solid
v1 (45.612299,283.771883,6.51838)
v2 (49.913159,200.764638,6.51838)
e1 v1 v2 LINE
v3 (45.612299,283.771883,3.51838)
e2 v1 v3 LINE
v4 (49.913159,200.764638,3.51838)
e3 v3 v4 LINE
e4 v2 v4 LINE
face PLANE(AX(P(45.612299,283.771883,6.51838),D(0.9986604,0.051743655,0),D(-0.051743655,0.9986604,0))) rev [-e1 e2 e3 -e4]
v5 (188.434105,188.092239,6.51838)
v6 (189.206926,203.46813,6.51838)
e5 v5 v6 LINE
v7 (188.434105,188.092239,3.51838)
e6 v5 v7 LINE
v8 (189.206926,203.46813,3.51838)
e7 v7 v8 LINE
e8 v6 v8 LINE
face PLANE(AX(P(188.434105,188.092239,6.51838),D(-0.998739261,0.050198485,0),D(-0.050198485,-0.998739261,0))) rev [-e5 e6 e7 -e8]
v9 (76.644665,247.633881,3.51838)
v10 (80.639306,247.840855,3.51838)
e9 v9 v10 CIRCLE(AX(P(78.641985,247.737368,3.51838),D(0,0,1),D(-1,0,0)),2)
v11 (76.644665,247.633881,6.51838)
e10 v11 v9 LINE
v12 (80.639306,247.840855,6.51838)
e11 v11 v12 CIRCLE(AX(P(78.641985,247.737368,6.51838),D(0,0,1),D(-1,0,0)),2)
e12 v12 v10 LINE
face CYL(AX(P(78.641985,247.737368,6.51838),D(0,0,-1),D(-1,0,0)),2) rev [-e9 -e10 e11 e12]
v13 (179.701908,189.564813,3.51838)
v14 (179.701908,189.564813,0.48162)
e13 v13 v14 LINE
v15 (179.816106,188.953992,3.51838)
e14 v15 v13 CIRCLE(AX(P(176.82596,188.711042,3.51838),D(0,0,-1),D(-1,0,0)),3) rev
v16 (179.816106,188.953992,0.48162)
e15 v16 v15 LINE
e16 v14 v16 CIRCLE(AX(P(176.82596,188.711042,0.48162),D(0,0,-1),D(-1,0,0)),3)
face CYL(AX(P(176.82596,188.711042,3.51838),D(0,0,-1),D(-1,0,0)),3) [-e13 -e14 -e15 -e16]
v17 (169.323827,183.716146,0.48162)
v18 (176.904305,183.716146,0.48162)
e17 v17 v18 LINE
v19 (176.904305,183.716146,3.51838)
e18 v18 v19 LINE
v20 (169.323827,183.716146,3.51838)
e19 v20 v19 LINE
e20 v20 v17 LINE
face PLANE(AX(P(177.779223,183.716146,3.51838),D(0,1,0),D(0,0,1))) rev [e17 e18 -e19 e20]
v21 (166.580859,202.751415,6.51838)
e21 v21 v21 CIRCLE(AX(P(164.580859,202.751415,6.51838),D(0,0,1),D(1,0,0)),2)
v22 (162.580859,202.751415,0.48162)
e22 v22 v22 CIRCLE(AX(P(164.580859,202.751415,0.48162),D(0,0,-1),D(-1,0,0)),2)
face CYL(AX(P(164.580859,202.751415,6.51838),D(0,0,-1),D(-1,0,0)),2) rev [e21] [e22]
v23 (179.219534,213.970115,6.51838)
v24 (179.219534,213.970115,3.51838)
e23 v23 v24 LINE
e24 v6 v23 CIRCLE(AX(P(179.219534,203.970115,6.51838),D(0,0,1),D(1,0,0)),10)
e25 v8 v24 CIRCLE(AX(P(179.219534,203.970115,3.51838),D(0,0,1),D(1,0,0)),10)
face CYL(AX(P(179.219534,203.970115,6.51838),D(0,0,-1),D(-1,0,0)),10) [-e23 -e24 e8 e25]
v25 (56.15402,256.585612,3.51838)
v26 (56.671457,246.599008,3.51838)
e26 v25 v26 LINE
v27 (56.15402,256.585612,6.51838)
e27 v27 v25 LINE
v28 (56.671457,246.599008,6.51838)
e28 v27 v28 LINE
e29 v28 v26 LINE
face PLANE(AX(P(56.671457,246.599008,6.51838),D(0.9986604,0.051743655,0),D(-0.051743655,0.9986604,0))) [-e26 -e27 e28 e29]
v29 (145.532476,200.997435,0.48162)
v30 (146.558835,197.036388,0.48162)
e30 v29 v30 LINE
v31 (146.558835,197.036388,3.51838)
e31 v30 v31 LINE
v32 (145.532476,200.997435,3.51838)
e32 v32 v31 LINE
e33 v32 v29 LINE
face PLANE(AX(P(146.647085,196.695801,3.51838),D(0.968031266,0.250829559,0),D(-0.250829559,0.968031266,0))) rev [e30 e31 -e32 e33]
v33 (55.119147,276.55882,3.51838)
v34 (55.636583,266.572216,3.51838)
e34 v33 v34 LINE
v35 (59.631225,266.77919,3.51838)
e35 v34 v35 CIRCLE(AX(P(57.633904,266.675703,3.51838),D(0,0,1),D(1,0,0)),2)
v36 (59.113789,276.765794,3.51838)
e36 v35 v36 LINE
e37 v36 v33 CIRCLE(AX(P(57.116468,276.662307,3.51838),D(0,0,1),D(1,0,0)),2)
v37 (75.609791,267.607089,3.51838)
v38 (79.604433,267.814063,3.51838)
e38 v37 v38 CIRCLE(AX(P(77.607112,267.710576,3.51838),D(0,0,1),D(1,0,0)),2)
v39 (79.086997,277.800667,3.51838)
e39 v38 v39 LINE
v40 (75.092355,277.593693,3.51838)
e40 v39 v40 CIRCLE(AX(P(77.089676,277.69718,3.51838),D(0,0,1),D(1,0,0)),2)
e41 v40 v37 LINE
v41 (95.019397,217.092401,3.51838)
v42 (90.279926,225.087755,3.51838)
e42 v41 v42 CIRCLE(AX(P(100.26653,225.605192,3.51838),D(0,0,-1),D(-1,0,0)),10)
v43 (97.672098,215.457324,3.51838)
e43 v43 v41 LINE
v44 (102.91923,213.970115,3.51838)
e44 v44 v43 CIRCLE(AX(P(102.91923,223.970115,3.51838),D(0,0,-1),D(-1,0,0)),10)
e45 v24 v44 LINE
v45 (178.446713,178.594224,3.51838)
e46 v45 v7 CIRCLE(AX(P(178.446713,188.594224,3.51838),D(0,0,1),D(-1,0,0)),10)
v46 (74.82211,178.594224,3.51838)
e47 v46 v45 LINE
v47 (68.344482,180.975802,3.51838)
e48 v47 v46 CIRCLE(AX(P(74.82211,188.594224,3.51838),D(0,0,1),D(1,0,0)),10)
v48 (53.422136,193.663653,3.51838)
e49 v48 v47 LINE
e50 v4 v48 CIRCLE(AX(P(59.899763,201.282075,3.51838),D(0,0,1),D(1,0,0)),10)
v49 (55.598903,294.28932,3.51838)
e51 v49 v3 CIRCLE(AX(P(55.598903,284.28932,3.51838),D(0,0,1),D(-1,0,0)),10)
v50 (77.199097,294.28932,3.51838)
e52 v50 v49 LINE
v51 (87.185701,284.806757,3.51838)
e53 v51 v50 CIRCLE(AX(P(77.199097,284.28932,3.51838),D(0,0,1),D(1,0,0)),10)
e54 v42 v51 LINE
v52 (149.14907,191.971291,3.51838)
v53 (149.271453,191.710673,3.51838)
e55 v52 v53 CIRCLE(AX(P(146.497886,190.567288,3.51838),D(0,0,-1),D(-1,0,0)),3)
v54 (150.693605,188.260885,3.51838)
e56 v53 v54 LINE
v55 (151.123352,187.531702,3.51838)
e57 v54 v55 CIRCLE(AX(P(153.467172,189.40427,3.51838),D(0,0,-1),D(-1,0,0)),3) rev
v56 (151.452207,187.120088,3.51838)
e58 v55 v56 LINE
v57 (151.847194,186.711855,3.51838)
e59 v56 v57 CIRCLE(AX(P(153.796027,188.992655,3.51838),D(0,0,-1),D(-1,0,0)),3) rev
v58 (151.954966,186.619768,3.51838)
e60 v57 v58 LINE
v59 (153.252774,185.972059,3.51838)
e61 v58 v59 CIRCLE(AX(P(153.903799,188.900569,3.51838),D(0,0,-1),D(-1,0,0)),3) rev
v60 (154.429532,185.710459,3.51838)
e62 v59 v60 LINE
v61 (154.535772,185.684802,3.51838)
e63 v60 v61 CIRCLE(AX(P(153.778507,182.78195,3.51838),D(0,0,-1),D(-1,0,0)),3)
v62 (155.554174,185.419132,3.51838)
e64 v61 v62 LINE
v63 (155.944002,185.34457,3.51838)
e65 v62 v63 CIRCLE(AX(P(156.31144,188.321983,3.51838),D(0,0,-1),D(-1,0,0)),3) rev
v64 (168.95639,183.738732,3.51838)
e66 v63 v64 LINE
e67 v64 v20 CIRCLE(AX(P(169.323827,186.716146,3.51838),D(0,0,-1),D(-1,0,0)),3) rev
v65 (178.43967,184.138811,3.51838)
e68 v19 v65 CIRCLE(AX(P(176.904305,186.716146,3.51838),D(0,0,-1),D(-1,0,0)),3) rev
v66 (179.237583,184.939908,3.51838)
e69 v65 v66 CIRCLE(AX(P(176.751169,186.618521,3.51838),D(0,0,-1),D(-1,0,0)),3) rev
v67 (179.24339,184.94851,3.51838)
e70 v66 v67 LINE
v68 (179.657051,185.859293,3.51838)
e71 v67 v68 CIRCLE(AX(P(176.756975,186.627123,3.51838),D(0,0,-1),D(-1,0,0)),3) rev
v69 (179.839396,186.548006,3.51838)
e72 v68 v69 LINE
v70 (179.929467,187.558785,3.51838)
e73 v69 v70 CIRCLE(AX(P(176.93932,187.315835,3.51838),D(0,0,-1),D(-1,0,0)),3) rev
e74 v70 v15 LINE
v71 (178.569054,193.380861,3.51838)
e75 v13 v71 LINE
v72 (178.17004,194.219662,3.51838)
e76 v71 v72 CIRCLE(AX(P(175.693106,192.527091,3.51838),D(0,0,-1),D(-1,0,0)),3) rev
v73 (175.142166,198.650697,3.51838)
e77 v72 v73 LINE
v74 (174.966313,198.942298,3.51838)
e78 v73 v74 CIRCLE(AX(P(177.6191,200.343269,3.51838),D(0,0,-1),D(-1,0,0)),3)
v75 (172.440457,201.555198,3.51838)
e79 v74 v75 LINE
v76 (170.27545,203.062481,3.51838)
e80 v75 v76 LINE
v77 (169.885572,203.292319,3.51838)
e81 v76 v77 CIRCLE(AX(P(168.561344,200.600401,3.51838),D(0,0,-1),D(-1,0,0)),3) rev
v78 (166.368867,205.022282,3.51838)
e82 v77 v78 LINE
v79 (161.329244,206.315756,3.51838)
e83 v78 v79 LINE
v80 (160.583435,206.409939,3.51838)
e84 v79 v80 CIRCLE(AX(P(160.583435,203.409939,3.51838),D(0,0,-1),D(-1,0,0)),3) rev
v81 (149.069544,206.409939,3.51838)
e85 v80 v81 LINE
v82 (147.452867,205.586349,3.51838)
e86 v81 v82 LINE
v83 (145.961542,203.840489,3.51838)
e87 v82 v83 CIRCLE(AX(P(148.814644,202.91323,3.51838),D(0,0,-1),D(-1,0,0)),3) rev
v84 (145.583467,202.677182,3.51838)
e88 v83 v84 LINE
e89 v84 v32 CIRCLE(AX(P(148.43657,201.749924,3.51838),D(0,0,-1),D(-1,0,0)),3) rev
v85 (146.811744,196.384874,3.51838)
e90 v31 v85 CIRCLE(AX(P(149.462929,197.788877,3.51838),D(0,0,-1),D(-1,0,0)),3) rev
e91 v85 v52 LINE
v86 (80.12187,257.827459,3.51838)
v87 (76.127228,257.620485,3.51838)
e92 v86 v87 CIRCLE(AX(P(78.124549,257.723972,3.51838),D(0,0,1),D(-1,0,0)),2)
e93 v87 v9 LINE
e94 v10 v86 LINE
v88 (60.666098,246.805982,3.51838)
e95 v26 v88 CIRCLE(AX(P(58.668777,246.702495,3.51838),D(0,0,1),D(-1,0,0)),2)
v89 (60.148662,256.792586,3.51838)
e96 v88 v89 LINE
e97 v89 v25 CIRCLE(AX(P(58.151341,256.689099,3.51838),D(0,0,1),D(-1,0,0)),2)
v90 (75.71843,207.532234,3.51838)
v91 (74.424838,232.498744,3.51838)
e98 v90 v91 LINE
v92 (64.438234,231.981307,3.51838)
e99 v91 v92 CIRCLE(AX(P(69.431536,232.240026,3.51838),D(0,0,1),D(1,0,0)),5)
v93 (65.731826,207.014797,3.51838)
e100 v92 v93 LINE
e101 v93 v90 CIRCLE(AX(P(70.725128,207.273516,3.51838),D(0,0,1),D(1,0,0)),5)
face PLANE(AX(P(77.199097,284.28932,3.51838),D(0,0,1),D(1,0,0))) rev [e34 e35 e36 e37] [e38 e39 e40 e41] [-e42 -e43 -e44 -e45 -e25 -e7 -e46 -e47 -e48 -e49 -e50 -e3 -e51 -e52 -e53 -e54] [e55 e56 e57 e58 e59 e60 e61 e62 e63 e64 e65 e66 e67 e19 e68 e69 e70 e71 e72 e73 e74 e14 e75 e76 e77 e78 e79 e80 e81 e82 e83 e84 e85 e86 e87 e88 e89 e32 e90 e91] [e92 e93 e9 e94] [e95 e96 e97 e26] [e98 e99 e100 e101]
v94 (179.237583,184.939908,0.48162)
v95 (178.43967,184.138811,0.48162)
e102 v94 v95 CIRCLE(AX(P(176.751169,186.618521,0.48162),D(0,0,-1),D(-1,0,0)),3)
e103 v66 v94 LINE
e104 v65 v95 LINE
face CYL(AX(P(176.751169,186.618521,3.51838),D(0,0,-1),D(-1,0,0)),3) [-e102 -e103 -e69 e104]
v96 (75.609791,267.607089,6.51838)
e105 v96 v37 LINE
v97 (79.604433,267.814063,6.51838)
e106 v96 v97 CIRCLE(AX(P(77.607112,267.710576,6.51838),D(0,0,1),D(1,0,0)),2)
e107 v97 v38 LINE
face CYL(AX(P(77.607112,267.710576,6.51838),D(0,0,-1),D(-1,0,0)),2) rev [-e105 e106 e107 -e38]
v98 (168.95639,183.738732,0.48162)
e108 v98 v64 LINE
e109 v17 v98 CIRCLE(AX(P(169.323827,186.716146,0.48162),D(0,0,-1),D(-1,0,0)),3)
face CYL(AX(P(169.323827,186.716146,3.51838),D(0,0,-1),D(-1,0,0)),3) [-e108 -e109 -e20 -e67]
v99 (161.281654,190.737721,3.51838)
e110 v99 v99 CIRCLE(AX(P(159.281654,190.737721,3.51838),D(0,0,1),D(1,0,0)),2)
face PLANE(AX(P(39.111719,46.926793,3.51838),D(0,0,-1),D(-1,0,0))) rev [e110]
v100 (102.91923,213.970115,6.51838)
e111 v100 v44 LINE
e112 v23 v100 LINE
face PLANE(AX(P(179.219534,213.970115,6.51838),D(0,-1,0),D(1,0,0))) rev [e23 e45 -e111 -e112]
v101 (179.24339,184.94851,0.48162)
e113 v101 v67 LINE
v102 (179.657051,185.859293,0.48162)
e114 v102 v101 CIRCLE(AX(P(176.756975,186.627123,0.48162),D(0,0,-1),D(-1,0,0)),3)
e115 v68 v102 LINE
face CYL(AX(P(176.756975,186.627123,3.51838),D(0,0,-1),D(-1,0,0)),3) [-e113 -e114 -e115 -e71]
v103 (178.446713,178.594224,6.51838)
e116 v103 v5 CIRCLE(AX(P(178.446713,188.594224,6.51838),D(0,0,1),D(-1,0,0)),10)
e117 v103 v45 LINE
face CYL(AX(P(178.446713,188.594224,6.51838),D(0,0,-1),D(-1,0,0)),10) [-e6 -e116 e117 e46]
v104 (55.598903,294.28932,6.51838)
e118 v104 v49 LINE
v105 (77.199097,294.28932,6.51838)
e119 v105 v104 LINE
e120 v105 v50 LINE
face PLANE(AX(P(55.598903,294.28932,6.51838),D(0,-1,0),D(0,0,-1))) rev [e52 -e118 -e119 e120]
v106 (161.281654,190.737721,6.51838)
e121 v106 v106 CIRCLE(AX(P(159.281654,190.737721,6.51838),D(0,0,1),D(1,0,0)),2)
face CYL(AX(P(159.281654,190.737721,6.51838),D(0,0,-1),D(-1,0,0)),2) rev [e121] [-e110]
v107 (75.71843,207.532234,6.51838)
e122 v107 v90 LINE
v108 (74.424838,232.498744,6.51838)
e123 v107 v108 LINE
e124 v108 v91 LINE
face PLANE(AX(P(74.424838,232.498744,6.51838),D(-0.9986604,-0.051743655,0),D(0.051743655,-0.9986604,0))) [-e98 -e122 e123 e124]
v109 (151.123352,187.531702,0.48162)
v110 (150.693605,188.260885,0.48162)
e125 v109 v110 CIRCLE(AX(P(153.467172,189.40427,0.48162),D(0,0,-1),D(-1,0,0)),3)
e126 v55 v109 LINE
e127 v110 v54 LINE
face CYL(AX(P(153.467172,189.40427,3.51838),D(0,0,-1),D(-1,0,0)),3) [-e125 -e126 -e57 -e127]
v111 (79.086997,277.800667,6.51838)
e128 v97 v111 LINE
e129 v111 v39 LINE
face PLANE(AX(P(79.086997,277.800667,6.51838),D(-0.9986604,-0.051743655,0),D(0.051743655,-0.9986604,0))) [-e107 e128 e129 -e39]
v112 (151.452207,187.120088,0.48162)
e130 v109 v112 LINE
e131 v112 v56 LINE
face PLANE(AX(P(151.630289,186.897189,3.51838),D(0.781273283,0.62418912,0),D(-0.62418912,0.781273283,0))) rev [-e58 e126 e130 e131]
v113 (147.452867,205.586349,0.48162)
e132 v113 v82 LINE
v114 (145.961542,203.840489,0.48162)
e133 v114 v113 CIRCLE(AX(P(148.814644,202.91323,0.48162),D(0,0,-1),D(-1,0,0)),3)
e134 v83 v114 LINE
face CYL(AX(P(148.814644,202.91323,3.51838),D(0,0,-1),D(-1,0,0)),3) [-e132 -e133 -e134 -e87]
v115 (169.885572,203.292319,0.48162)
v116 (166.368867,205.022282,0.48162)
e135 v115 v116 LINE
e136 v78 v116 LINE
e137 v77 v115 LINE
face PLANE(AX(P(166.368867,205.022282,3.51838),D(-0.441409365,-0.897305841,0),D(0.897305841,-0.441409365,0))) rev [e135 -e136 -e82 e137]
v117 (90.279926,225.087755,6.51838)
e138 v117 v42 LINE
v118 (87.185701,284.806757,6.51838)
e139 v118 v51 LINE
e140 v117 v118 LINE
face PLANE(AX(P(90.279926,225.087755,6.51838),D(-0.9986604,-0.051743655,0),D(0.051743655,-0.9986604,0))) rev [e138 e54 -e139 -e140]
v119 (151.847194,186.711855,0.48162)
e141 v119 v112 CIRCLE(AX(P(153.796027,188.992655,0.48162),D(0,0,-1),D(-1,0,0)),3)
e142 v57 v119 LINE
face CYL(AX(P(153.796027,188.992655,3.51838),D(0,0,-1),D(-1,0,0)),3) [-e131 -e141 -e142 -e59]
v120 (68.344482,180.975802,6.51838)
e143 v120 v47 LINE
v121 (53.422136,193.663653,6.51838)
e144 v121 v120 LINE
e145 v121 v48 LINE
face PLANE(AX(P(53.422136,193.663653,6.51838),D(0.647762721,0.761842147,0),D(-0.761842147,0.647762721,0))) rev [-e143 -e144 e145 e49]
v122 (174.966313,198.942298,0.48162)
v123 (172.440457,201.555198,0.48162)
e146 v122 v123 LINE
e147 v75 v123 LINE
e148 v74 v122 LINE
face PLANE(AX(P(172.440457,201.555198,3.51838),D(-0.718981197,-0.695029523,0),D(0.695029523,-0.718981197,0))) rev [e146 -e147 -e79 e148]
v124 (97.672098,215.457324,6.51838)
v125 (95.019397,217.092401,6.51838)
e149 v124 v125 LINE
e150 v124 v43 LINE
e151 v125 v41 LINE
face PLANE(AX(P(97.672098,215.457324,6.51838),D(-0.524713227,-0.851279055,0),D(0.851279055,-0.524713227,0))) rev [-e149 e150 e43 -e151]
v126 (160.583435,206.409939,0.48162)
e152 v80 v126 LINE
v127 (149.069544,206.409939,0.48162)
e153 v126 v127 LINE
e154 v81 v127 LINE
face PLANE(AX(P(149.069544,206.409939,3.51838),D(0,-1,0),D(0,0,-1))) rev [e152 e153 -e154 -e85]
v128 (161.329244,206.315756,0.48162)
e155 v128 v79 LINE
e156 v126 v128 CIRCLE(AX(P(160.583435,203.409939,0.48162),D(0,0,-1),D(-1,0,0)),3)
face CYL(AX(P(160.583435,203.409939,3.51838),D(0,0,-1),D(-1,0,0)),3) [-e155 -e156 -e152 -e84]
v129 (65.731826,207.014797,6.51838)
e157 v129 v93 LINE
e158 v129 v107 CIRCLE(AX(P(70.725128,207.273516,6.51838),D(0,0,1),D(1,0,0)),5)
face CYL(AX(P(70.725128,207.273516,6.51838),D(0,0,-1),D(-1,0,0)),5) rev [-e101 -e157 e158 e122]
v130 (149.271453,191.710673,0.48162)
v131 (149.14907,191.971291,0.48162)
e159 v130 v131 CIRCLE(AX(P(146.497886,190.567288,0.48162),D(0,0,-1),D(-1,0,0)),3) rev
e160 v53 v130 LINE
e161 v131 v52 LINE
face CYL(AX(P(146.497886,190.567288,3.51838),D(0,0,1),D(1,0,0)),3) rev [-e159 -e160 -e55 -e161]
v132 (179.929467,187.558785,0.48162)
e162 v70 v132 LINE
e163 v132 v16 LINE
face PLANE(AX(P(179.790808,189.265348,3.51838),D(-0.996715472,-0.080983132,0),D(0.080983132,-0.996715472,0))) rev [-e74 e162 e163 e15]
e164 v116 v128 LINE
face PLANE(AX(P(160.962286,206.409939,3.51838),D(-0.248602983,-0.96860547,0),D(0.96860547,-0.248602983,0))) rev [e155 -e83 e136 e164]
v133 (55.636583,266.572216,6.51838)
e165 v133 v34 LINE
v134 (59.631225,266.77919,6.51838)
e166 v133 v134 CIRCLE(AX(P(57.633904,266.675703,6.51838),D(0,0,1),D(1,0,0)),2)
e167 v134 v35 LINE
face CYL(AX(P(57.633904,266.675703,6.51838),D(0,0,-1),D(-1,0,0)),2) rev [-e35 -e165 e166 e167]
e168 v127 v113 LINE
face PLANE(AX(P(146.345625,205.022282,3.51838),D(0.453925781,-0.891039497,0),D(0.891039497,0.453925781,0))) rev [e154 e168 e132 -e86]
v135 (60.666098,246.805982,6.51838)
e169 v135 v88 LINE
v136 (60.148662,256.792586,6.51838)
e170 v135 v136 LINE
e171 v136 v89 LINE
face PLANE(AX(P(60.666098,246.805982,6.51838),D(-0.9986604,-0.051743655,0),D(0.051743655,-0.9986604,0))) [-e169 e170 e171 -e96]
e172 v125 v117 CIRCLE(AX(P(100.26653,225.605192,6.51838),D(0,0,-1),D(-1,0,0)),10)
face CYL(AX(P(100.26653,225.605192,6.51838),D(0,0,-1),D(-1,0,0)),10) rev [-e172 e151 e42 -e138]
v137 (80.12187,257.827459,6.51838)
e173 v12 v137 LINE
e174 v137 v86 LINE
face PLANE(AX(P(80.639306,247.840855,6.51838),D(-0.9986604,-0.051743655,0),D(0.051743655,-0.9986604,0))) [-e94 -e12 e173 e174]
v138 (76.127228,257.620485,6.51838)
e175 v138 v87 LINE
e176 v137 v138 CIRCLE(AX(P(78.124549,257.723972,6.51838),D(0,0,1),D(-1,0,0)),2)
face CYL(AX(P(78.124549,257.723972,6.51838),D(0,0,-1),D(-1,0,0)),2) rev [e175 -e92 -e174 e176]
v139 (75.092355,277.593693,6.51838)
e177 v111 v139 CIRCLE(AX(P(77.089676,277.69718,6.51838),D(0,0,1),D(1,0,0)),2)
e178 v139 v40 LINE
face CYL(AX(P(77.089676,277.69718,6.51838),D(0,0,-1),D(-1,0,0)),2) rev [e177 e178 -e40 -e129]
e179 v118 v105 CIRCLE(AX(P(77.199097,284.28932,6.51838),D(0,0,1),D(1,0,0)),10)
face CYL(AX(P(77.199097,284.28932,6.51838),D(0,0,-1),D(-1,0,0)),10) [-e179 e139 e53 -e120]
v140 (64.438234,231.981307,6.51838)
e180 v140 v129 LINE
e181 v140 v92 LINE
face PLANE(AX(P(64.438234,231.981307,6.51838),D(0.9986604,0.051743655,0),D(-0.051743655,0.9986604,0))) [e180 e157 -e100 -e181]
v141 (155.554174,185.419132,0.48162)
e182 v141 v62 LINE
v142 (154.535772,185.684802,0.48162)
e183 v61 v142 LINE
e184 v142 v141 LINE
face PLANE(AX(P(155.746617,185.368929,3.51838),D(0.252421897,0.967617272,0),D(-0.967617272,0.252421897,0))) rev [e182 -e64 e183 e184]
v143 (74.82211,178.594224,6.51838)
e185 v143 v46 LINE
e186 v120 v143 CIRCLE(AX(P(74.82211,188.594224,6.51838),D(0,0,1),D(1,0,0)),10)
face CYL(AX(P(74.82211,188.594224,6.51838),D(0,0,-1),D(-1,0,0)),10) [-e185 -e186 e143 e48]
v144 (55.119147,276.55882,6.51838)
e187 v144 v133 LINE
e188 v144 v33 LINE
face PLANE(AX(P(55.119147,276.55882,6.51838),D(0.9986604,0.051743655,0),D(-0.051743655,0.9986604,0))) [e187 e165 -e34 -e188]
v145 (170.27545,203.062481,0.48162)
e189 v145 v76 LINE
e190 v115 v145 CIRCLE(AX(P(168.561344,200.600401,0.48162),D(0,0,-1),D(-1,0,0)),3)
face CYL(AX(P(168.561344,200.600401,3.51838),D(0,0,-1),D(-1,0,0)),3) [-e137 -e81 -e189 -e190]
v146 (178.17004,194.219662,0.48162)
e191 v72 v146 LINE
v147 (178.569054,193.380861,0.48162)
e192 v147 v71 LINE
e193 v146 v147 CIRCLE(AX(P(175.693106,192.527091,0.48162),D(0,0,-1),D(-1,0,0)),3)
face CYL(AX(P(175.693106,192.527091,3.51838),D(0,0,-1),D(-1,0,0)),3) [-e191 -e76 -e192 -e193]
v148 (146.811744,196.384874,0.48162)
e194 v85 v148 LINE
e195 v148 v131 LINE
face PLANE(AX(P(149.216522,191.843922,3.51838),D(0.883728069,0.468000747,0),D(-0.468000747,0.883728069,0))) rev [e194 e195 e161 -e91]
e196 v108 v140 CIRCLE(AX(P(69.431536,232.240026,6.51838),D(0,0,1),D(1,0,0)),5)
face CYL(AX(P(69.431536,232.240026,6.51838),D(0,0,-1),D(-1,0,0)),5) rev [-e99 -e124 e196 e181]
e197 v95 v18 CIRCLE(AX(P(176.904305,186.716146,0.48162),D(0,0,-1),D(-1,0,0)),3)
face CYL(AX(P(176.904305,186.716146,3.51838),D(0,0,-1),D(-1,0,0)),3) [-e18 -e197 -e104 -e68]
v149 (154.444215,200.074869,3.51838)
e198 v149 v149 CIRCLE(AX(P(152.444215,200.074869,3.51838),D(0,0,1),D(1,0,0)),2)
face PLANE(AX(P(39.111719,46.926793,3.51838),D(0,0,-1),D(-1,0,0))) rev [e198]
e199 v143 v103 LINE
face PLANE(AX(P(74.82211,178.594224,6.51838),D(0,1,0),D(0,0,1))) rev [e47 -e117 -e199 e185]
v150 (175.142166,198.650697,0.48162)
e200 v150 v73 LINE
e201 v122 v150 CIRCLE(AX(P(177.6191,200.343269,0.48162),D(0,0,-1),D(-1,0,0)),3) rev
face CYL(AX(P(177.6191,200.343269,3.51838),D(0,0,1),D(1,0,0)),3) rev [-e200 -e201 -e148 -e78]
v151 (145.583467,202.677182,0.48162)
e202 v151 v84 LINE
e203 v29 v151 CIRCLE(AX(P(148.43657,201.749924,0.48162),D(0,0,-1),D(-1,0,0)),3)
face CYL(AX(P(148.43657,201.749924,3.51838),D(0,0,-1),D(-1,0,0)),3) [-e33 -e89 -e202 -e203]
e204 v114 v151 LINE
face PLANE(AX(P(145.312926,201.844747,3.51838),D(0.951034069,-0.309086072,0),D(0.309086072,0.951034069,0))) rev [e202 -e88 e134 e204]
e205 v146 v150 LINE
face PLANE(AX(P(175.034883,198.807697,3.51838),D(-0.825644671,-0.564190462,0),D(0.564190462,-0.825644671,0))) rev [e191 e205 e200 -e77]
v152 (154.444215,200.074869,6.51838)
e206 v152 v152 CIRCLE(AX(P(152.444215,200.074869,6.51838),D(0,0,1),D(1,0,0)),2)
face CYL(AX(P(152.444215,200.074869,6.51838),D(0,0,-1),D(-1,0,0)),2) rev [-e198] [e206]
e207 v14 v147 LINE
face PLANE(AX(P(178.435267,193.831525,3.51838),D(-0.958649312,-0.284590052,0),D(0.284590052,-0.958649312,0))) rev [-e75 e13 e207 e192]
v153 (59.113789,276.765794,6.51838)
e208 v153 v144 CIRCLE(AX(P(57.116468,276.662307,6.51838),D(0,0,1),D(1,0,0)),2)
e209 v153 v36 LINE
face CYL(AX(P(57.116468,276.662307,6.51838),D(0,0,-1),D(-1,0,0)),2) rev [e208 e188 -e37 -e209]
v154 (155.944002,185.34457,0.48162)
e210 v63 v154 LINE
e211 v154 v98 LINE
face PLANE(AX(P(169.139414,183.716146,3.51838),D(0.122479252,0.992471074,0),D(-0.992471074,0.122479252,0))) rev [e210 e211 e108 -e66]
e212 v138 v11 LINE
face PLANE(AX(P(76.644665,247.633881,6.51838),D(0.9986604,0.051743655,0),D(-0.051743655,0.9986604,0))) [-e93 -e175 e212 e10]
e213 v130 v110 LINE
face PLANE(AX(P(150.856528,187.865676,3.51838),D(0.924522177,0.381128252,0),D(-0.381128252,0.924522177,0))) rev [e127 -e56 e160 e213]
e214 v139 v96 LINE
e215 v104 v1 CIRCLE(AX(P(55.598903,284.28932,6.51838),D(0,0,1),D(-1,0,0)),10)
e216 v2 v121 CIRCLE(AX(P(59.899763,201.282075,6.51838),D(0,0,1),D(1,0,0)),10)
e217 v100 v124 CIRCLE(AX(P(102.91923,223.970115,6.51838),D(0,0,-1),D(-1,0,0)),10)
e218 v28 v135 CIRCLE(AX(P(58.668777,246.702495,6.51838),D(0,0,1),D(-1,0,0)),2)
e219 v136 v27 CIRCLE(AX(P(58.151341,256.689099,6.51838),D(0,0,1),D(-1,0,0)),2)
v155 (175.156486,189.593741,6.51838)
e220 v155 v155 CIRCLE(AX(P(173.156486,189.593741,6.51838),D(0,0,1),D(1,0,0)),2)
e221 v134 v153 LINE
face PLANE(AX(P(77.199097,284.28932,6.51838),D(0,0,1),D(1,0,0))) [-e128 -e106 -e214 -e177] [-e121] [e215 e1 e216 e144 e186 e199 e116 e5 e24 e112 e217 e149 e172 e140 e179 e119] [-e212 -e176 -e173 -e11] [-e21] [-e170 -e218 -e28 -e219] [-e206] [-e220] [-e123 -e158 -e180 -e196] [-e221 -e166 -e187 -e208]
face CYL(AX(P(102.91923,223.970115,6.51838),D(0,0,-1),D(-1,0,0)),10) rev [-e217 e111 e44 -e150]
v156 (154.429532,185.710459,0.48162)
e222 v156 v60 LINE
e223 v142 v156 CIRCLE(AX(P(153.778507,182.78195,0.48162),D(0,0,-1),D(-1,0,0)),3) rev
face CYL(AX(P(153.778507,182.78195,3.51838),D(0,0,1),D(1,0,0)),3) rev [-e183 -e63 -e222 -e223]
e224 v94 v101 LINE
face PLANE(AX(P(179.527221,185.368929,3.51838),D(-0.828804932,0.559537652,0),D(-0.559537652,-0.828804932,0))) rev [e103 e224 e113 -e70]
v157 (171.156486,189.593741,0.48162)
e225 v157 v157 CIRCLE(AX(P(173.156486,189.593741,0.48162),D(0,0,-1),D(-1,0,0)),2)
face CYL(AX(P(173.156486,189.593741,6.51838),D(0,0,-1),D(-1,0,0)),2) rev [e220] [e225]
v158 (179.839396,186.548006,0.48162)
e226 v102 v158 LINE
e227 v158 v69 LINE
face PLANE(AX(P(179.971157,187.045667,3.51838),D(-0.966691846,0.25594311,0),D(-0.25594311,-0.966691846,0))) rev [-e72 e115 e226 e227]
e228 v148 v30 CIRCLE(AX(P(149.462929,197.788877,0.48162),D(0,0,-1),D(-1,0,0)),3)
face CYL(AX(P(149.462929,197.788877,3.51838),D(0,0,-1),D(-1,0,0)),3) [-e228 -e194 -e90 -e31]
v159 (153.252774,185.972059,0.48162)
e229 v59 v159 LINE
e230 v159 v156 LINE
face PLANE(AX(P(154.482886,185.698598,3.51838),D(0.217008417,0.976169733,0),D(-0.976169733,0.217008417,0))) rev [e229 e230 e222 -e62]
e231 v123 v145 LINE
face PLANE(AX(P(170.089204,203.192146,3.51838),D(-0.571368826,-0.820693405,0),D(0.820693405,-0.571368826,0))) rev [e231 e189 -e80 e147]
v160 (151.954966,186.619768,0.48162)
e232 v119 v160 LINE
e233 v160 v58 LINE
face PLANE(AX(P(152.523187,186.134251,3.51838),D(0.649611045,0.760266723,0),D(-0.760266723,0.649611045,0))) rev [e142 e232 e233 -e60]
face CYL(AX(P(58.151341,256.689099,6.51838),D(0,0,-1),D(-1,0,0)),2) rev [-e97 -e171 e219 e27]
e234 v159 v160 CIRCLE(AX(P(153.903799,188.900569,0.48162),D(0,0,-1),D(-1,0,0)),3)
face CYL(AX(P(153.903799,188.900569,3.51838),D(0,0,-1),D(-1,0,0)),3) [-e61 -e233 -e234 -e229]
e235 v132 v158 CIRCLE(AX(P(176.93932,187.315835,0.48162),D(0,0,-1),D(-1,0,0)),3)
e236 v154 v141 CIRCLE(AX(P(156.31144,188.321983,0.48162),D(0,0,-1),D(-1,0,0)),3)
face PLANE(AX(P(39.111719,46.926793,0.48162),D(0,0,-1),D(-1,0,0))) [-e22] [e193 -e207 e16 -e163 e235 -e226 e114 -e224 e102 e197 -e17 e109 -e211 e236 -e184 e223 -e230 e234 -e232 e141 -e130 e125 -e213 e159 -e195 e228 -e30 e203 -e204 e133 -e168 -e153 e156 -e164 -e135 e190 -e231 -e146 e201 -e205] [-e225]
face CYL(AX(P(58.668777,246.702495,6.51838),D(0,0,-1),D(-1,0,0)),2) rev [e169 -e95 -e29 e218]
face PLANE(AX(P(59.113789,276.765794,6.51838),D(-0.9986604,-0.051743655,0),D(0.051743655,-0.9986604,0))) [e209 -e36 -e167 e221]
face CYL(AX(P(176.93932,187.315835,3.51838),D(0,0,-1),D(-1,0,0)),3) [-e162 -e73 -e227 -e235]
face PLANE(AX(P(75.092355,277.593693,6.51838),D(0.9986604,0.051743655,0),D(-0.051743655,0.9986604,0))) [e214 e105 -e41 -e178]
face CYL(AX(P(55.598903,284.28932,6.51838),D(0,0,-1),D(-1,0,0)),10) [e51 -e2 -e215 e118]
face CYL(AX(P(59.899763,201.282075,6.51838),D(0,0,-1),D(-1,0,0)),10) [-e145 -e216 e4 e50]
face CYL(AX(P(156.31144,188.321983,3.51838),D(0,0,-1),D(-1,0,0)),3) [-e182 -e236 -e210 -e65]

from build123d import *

# Parameters (mm, degrees)
BOSS_EXTRUDE1_DEPTH = 4
SCALE4_SCALE        = 0.75919
FILLET6_R           = 3
FILLET7_R           = 3
SKETCH2_R           = 2
BOSS_EXTRUDE2_DEPTH = 3
CUT_EXTRUDE1_START  = -10
SKETCH3_R           = 2
CUT_EXTRUDE1_DEPTH  = 10


with BuildPart() as part:
    # Sketch1 → Boss-Extrude1 (new body)
    with BuildSketch(Plane.XY):
        Polygon((139.887521377, 204.056894723), (141.24778548, 208.242322731), (144.835713473, 210.070135105), (160.500754315, 210.070135105), (167.622266071, 208.242322731), (172.522669487, 205.831679823), (175.619724447, 203.675502319), (178.946764591, 200.233807794), (179.037084843, 200.056512483), (183.5160481, 193.501931379), (185.301557704, 187.487393826), (185.539112291, 184.563645059), (184.954362538, 182.355057305), (184.113784767, 181.109966828), (182.651910383, 180.178021908), (181.232301611, 180.178021908), (171.271612606, 180.178021908), (153.63070922, 182.355057305), (151.966131288, 182.789295026), (149.384829279, 183.363134026), (148.208709289, 184.36807152), (147.189516356, 185.643755739), (145.029311699, 190.88387399), (141.644867129, 197.274737006), align=None)
    extrude(amount=BOSS_EXTRUDE1_DEPTH)


with BuildPart() as part_1:
    # Scale4: scaled about (162.417336375, 194.870616826, 2)
    add(part.part.scale(SCALE4_SCALE).moved(Location((39.111718772, 46.926793238, 0.48162))))

    # Fillet6
    # the kernel refuses this fillet: 3 mm, written as the material it adds along each edge
    with BuildSketch(Plane(origin=(175.034883215, 198.80769695, 0.48162), x_dir=(0.5641904622979087, -0.8256446706980383, 0), z_dir=(0, 0, 1))) as fillet6_piece_1_section:
        with BuildLine():
            CenterArc((FILLET6_R * 0.0642311981219, FILLET6_R), FILLET6_R, 262.649743959, 7.350256041)
            Line((-FILLET6_R * 0.063703385216, FILLET6_R * 0.00821739156901), (0, 0))
            Line((0, 0), (FILLET6_R * 0.0642311981219, 0))
        make_face()
    fillet6_piece_1 = extrude(amount=3.03676, mode=Mode.PRIVATE)
    fillet6_piece_1 = split(fillet6_piece_1, bisect_by=Plane(origin=(175.064317261, 198.840916135, 2), z_dir=(-0.7189811970622167, -0.6950295233088893, 0)), keep=Keep.TOP, mode=Mode.PRIVATE)
    add(fillet6_piece_1)
    with BuildSketch(Plane(origin=(154.482885985, 185.698598128, 0.48162), x_dir=(-0.9761697325769959, 0.21700841734954968, 0), z_dir=(0, 0, 1))) as fillet6_piece_2:
        with BuildLine():
            CenterArc((FILLET6_R * 0.0182188067452, FILLET6_R), FILLET6_R, 267.912509474, 2.087490526)
            Line((-FILLET6_R * 0.0182067162065, FILLET6_R * 0.000663629563253), (0, 0))
            Line((0, 0), (FILLET6_R * 0.0182188067452, 0))
        make_face()
    extrude(amount=3.03676)
    with BuildSketch(Plane(origin=(149.216521921, 191.843921532, 0.48162), x_dir=(-0.4680007470830183, 0.8837280694476876, 0), z_dir=(0, 0, 1))) as fillet6_piece_3:
        with BuildLine():
            CenterArc((FILLET6_R * 0.0480422965927, FILLET6_R), FILLET6_R, 264.498987959, 5.501012041)
            Line((-FILLET6_R * 0.0478210380477, FILLET6_R * 0.00460549475516), (0, 0))
            Line((0, 0), (FILLET6_R * 0.0480422965927, 0))
        make_face()
    extrude(amount=3.03676)
    # the kernel refuses this fillet: 3 mm, written as the material it takes off along each edge
    with BuildSketch(Plane(origin=(170.089204221, 203.192146242, -0.085723646), x_dir=(0.8206934047378623, -0.5713688260832711, 0), z_dir=(0, 0, 1))) as fillet6_2_piece_1:
        with BuildLine():
            CenterArc((FILLET6_R * 0.0756458194575, -FILLET6_R), FILLET6_R, 90, 8.651894609)
            Line((-FILLET6_R * 0.0747850106227, -FILLET6_R * 0.0113794634131), (0, 0))
            Line((0, 0), (FILLET6_R * 0.0756458194575, 0))
        make_face()
    extrude(amount=4.171447292, mode=Mode.SUBTRACT)
    with BuildSketch(Plane(origin=(179.790808366, 189.265347757, -0.299334996), x_dir=(0.08098313210757263, -0.9967154720952452, 0), z_dir=(0, 0, 1))) as fillet6_2_piece_2:
        with BuildLine():
            CenterArc((FILLET6_R * 0.104127332747, -FILLET6_R), FILLET6_R, 90, 11.889267137)
            Line((-FILLET6_R * 0.101893551021, -FILLET6_R * 0.0214524051169), (0, 0))
            Line((0, 0), (FILLET6_R * 0.104127332747, 0))
        make_face()
    extrude(amount=4.598669991, mode=Mode.SUBTRACT)
    with BuildSketch(Plane(origin=(179.527221267, 185.368929193, -0.786529904), x_dir=(-0.5595376521790817, -0.8288049322934323, 0), z_dir=(0, 0, 1))) as fillet6_2_piece_3:
        with BuildLine():
            CenterArc((FILLET6_R * 0.169086653883, -FILLET6_R), FILLET6_R, 90, 19.194353316)
            Line((-FILLET6_R * 0.159686919919, -FILLET6_R * 0.0555912234793), (0, 0))
            Line((0, 0), (FILLET6_R * 0.169086653883, 0))
        make_face()
    extrude(amount=5.573059808, mode=Mode.SUBTRACT)
    with BuildSketch(Plane(origin=(178.435267329, 193.831524522, -0.693636489), x_dir=(0.2845900515763164, -0.9586493115544337, 0), z_dir=(0, 0, 1))) as fillet6_2_piece_4:
        with BuildLine():
            CenterArc((FILLET6_R * 0.156700865162, -FILLET6_R), FILLET6_R, 90, 17.811748872)
            Line((-FILLET6_R * 0.149189673688, -FILLET6_R * 0.0479333120825), (0, 0))
            Line((0, 0), (FILLET6_R * 0.156700865162, 0))
        make_face()
    extrude(amount=5.387272977, mode=Mode.SUBTRACT)
    with BuildSketch(Plane(origin=(178.88906303, 184.423668954, -1.075559702), x_dir=(-0.8432271980573246, -0.5375573387615439, 0), z_dir=(0, 0, 1))) as fillet6_2_piece_5:
        with BuildLine():
            CenterArc((FILLET6_R * 0.207623960269, -FILLET6_R), FILLET6_R, 90, 23.458660046)
            Line((-FILLET6_R * 0.190463329283, -FILLET6_R * 0.0826524595894), (0, 0))
            Line((0, 0), (FILLET6_R * 0.207623960269, 0))
        make_face()
    extrude(amount=6.151119404, mode=Mode.SUBTRACT)
    with BuildSketch(Plane(origin=(169.139414347, 183.71614569, 0.020587263), x_dir=(-0.9924710740045749, 0.12247925238261967, 0), z_dir=(0, 0, 1))) as fillet6_2_piece_6:
        with BuildLine():
            CenterArc((FILLET6_R * 0.0614710316153, -FILLET6_R), FILLET6_R, 90, 7.035208973)
            Line((-FILLET6_R * 0.0610082207674, -FILLET6_R * 0.00752892599542), (0, 0))
            Line((0, 0), (FILLET6_R * 0.0614710316153, 0))
        make_face()
    extrude(amount=3.958825474, mode=Mode.SUBTRACT)
    with BuildSketch(Plane(origin=(155.746616905, 185.368929193, -0.015587097), x_dir=(-0.9676172723968424, 0.2524218971470086, 0), z_dir=(0, 0, 1))) as fillet6_2_piece_7:
        with BuildLine():
            CenterArc((FILLET6_R * 0.0662942795425, -FILLET6_R), FILLET6_R, 90, 7.585665015)
            Line((-FILLET6_R * 0.0657141117056, -FILLET6_R * 0.00875140119136), (0, 0))
            Line((0, 0), (FILLET6_R * 0.0662942795425, 0))
        make_face()
    extrude(amount=4.031174193, mode=Mode.SUBTRACT)
    with BuildSketch(Plane(origin=(150.856527695, 187.865676157, -0.587064111), x_dir=(-0.3811282524443585, 0.9245221766884282, 0), z_dir=(0, 0, 1))) as fillet6_2_piece_8:
        with BuildLine():
            CenterArc((FILLET6_R * 0.14249121477, -FILLET6_R), FILLET6_R, 90, 16.21910898)
            Line((-FILLET6_R * 0.136820147731, -FILLET6_R * 0.0397994153417), (0, 0))
            Line((0, 0), (FILLET6_R * 0.14249121477, 0))
        make_face()
    extrude(amount=5.174128222, mode=Mode.SUBTRACT)
    with BuildSketch(Plane(origin=(151.630288778, 186.897189455, -0.231632642), x_dir=(-0.6241891196597051, 0.7812732831080572, 0), z_dir=(0, 0, 1))) as fillet6_2_piece_9:
        with BuildLine():
            CenterArc((FILLET6_R * 0.0951003522105, -FILLET6_R), FILLET6_R, 90, 10.865021551)
            Line((-FILLET6_R * 0.0933955804828, -FILLET6_R * 0.0179260295894), (0, 0))
            Line((0, 0), (FILLET6_R * 0.0951003522104, 0))
        make_face()
    extrude(amount=4.463265283, mode=Mode.SUBTRACT)
    with BuildSketch(Plane(origin=(152.523187313, 186.134250959, -1.386873198), x_dir=(-0.7602667232190712, 0.6496110448304708, 0), z_dir=(0, 0, 1))) as fillet6_2_piece_10:
        with BuildLine():
            CenterArc((FILLET6_R * 0.249132426376, -FILLET6_R), FILLET6_R, 90, 27.978899274)
            Line((-FILLET6_R * 0.220013935166, -FILLET6_R * 0.116879571377), (0, 0))
            Line((0, 0), (FILLET6_R * 0.249132426376, 0))
        make_face()
    extrude(amount=6.773746396, mode=Mode.SUBTRACT)
    with BuildSketch(Plane(origin=(177.779222616, 183.71614569, -1.705674136), x_dir=(-1, 0, 0), z_dir=(0, 0, 1))) as fillet6_2_piece_11:
        with BuildLine():
            CenterArc((FILLET6_R * 0.291639218067, -FILLET6_R), FILLET6_R, 90, 32.517510615)
            Line((-FILLET6_R * 0.245918120694, -FILLET6_R * 0.156772801943), (0, 0))
            Line((0, 0), (FILLET6_R * 0.291639218067, 0))
        make_face()
    extrude(amount=7.411348271, mode=Mode.SUBTRACT)
    with BuildSketch(Plane(origin=(146.647085448, 196.695800825, -0.397967253), x_dir=(0.4680007470830723, -0.8837280694476589, 0), z_dir=(0, 0, 1))) as fillet6_2_piece_12:
        with BuildLine():
            CenterArc((FILLET6_R * 0.117278300393, FILLET6_R), FILLET6_R, 256.622007888, 13.377992112)
            Line((-FILLET6_R * 0.114095932972, FILLET6_R * 0.027135176844), (0, 0))
            Line((0, 0), (FILLET6_R * 0.117278300394, 0))
        make_face()
    extrude(amount=4.795934506, mode=Mode.SUBTRACT)

    # Fillet7
    fillet7_edges = [part_1.edges().sort_by_distance(p)[0] for p in [
        (145.312926127, 201.844747143, 2),
        (146.345625031, 205.022282232, 2),
        (160.962286441, 206.409939108, 2),
        (179.971157433, 187.04566693, 2),
    ]]
    fillet(fillet7_edges, radius=FILLET7_R)

    # Sketch2 → Boss-Extrude2 (add)
    with BuildSketch(Plane.XY.offset(3.51838)):
        with BuildLine():
            Line((188.434105361, 188.092238721), (189.20692612, 203.468129761))
            ThreePointArc((189.20692612, 203.468129761), (186.465906686, 210.861418968), (179.219533507, 213.97011461))
            Line((179.219533507, 213.97011461), (102.919230161, 213.97011461))
            ThreePointArc((102.919230161, 213.97011461), (100.192318492, 214.349098408), (97.672097891, 215.45732406))
            Line((97.672097891, 215.45732406), (95.019397498, 217.092401272))
            ThreePointArc((95.019397498, 217.092401272), (91.664314845, 220.505986156), (90.27992577, 225.087755274))
            Line((90.27992577, 225.087755274), (87.185701358, 284.806756585))
            ThreePointArc((87.185701358, 284.806756585), (84.084793931, 291.541022095), (77.19909736, 294.289320037))
            Line((77.19909736, 294.289320037), (55.59890347, 294.289320037))
            ThreePointArc((55.59890347, 294.289320037), (48.347201412, 291.175016608), (45.612299472, 283.77188349))
            Line((45.612299472, 283.77188349), (49.913159154, 200.7646381))
            ThreePointArc((49.913159154, 200.7646381), (50.934623775, 196.851919353), (53.422135939, 193.663653179))
            Line((53.422135939, 193.663653179), (68.344482326, 180.975802101))
            ThreePointArc((68.344482326, 180.975802101), (71.371328084, 179.208483997), (74.822109539, 178.59422357))
            Line((74.822109539, 178.59422357), (178.446712748, 178.59422357))
            ThreePointArc((178.446712748, 178.59422357), (185.338017106, 181.347850392), (188.434105361, 188.092238721))
        make_face()
        with Locations((173.156485543, 189.59374103)):
            Circle(SKETCH2_R, mode=Mode.SUBTRACT)
        with Locations((164.580858822, 202.751414961)):
            Circle(SKETCH2_R, mode=Mode.SUBTRACT)
        with Locations((159.281654358, 190.737720877)):
            Circle(SKETCH2_R, mode=Mode.SUBTRACT)
        with Locations((152.444215345, 200.074868776)):
            Circle(SKETCH2_R, mode=Mode.SUBTRACT)
        with BuildLine():
            Line((59.113788522, 276.765794371), (59.63122507, 266.779190373))
            ThreePointArc((59.63122507, 266.779190373), (57.73739158, 264.678382264), (55.636583471, 266.572215754))
            Line((55.636583471, 266.572215754), (55.119146923, 276.558819752))
            ThreePointArc((55.119146923, 276.558819752), (57.012980413, 278.659627861), (59.113788522, 276.765794371))
        make_face(mode=Mode.SUBTRACT)
        with BuildLine():
            Line((79.086996519, 277.800667467), (79.604433066, 267.814063469))
            ThreePointArc((79.604433066, 267.814063469), (77.710599576, 265.713255359), (75.609791467, 267.607088849))
            Line((75.609791467, 267.607088849), (75.092354919, 277.593692848))
            ThreePointArc((75.092354919, 277.593692848), (76.986188409, 279.694500957), (79.086996519, 277.800667467))
        make_face(mode=Mode.SUBTRACT)
        with BuildLine():
            Line((60.666098165, 246.805982376), (60.148661618, 256.792586375))
            ThreePointArc((60.148661618, 256.792586375), (58.047853508, 258.686419865), (56.154020018, 256.585611756))
            Line((56.154020018, 256.585611756), (56.671456566, 246.599007757))
            ThreePointArc((56.671456566, 246.599007757), (58.772264675, 244.705174267), (60.666098165, 246.805982376))
        make_face(mode=Mode.SUBTRACT)
        with BuildLine():
            Line((80.639306162, 247.840855472), (80.121869614, 257.82745947))
            ThreePointArc((80.121869614, 257.82745947), (78.021061505, 259.72129296), (76.127228015, 257.620484851))
            Line((76.127228015, 257.620484851), (76.644664563, 247.633880853))
            ThreePointArc((76.644664563, 247.633880853), (78.745472672, 245.740047363), (80.639306162, 247.840855472))
        make_face(mode=Mode.SUBTRACT)
        with BuildLine():
            Line((74.424838185, 232.498743891), (75.718429554, 207.532233895))
            ThreePointArc((75.718429554, 207.532233895), (70.983845829, 202.280213622), (65.731825556, 207.014797347))
            Line((65.731825556, 207.014797347), (64.438234187, 231.981307343))
            ThreePointArc((64.438234187, 231.981307343), (69.172817912, 237.233327616), (74.424838185, 232.498743891))
        make_face(mode=Mode.SUBTRACT)
    extrude(amount=BOSS_EXTRUDE2_DEPTH)

    # Sketch3 → Cut-Extrude1 (cut)
    with BuildSketch(Plane.XY.offset(3.51838).offset(CUT_EXTRUDE1_START)):
        with Locations(Location((164.580858822, 202.751414961, 0), (0, 0, 180))):
            Circle(SKETCH3_R)
        with Locations(Location((173.156485543, 189.59374103, 0), (0, 0, 180))):
            Circle(SKETCH3_R)
    extrude(amount=CUT_EXTRUDE1_DEPTH, mode=Mode.SUBTRACT)


solid = part_1.part
